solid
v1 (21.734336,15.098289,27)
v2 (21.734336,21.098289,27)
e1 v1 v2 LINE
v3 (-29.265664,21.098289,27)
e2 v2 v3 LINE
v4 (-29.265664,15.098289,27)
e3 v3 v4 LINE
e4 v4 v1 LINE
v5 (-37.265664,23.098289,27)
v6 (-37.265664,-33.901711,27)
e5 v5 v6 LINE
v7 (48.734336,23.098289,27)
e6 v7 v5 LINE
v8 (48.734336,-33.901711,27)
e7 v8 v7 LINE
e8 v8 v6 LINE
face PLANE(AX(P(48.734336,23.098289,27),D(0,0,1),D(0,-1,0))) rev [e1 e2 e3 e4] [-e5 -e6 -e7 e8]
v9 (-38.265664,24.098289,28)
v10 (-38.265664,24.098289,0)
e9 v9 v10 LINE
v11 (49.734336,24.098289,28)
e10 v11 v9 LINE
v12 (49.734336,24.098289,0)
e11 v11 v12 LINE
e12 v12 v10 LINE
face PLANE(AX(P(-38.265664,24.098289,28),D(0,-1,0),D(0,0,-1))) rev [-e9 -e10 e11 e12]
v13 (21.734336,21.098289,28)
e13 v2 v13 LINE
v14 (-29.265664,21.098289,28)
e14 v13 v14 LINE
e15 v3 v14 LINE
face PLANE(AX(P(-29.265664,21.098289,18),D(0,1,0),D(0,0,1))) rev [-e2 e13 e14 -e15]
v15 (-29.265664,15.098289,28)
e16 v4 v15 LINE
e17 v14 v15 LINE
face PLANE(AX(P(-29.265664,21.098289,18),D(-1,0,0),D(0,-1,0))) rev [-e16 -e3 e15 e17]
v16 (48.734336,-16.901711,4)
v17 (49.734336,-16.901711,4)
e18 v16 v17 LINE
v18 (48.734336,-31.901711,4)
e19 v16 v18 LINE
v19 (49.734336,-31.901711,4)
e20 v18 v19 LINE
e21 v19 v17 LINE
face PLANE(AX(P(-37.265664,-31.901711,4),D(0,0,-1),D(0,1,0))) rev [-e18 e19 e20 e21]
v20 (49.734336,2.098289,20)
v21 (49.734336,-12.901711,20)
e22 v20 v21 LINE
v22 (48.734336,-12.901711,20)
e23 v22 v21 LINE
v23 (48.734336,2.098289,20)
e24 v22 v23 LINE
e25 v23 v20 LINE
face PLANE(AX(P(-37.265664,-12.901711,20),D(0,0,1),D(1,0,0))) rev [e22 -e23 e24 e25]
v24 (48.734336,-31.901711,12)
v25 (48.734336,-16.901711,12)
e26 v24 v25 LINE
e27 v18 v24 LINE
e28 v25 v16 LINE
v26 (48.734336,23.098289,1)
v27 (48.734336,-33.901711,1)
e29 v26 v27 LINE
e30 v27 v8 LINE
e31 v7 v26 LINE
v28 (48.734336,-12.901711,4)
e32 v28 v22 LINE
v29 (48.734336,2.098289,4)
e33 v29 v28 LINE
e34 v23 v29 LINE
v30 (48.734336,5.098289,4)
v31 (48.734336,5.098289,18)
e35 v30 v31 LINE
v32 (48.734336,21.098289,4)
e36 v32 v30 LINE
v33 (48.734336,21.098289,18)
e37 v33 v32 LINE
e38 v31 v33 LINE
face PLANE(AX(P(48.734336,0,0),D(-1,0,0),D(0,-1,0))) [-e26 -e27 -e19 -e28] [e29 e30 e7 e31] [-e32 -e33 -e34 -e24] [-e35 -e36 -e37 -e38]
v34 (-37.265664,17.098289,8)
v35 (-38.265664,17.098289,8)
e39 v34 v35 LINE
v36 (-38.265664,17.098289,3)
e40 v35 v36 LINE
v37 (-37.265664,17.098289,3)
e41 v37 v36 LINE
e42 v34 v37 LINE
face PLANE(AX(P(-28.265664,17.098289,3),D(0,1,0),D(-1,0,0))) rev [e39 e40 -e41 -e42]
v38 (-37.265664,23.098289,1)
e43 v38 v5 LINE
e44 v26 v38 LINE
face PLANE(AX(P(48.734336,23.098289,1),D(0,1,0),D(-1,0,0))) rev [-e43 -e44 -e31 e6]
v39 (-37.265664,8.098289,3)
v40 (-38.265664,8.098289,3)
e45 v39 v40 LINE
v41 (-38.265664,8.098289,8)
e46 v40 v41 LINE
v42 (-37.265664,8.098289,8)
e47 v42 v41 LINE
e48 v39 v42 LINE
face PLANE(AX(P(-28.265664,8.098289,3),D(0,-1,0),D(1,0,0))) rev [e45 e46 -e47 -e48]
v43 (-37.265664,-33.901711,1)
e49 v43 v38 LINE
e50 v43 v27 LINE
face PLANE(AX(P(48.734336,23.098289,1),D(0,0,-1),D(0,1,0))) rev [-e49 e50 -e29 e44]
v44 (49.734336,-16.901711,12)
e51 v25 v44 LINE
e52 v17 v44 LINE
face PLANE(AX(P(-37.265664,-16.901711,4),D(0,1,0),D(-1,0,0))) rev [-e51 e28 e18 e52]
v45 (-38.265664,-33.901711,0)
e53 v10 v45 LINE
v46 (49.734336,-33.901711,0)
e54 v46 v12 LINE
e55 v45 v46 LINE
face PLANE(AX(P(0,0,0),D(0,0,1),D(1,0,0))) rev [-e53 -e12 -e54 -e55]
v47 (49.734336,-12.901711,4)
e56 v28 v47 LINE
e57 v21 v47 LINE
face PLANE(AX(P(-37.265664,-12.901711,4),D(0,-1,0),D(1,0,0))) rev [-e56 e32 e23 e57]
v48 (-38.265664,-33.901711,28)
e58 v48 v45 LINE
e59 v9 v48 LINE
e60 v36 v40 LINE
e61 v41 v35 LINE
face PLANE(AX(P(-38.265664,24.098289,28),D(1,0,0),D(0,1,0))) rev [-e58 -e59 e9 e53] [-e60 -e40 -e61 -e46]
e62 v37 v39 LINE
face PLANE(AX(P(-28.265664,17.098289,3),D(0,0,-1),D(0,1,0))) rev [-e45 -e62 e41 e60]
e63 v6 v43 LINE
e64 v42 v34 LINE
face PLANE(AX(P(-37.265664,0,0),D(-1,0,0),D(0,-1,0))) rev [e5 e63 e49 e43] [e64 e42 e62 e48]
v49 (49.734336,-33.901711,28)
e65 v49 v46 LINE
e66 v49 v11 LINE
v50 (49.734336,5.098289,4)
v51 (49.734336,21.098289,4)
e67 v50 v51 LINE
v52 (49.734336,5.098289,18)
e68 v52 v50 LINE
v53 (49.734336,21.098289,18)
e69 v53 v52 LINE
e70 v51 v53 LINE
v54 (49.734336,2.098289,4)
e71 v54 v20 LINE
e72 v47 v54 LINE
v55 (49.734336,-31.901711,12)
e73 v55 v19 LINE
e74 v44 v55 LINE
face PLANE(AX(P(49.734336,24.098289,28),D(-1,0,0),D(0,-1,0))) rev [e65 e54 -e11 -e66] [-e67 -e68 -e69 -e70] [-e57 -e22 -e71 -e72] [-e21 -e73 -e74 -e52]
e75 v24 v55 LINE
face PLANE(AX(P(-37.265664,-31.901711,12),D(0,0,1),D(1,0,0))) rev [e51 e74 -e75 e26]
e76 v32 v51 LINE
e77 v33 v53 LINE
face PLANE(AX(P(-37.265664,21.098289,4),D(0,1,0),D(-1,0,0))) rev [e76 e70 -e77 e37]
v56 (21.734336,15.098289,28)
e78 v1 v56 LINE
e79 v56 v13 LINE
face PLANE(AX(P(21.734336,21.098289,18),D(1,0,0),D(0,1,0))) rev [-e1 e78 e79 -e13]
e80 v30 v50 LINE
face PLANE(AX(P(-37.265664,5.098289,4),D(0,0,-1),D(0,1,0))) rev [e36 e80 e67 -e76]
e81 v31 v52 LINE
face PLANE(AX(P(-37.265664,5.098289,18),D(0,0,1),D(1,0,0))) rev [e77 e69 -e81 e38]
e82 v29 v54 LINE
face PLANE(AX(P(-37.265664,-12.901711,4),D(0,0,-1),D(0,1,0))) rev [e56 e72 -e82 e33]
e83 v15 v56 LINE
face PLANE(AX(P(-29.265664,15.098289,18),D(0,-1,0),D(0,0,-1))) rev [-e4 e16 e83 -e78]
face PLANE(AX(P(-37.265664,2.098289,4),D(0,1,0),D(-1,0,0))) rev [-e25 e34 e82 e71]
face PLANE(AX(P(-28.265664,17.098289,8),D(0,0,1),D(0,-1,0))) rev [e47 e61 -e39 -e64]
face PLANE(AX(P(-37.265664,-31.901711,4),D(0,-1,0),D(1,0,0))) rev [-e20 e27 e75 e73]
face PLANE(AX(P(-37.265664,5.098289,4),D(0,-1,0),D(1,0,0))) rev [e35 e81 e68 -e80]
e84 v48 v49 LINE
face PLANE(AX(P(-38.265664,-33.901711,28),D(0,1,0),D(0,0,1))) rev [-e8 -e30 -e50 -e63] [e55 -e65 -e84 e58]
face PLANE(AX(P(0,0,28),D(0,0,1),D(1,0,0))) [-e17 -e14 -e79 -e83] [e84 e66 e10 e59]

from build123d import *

# Parameters (mm, degrees)
SKETCH_1_W          = 88
SKETCH_1_H          = 58
EXTRUDE_1_DEPTH     = 28
SKETCH_2_W          = 26
SKETCH_2_H          = 56
CUT_EXTRUDE_1_DEPTH = 87
SKETCH_3_W          = 8
SKETCH_3_H          = 15
SKETCH_3_W_2        = 16
SKETCH_3_W_3        = 14
SKETCH_3_H_2        = 16
CUT_EXTRUDE_2_DEPTH = 87
SKETCH_4_W          = 28
SKETCH_4_H          = 58
EXTRUDE_2_DEPTH     = 1
SKETCH_6_W          = 51
SKETCH_6_H          = 6
CUT_EXTRUDE_4_DEPTH = 10
SKETCH_7_W          = 5
SKETCH_7_H          = 9
CUT_EXTRUDE_5_DEPTH = 10
SKETCH_8_W          = 86
SKETCH_8_H          = 26
CUT_EXTRUDE_6_DEPTH = 57


with BuildPart() as part:
    # 草图1 → 凸台-拉伸1 (new body)
    with BuildSketch(Plane.XY):
        with Locations((5.73433584, -4.901711192)):
            Rectangle(SKETCH_1_W, SKETCH_1_H)
    extrude(amount=EXTRUDE_1_DEPTH)

    # 草图2 → 切除-拉伸1 (cut)
    with BuildSketch(Plane.ZY.offset(38.26566416)):
        with Locations((14, -4.901711192)):
            Rectangle(SKETCH_2_W, SKETCH_2_H)
    extrude(amount=-CUT_EXTRUDE_1_DEPTH, mode=Mode.SUBTRACT)

    # 草图3 → 切除-拉伸2 (cut)
    with BuildSketch(Plane(origin=(49.73433584, 0, 0), x_dir=(0, 0, -1), z_dir=(1, 0, 0))):
        with Locations((-8, -24.401711192)):
            Rectangle(SKETCH_3_W, SKETCH_3_H)
        with Locations((-12, -5.401711192)):
            Rectangle(SKETCH_3_W_2, SKETCH_3_H)
        with Locations((-11, 13.098288808)):
            Rectangle(SKETCH_3_W_3, SKETCH_3_H_2)
    extrude(amount=-CUT_EXTRUDE_2_DEPTH, mode=Mode.SUBTRACT)

    # 草图4 → 凸台-拉伸2 (add)
    with BuildSketch(Plane.ZY.offset(38.26566416)):
        with Locations((14, -4.901711192)):
            Rectangle(SKETCH_4_W, SKETCH_4_H)
    extrude(amount=-EXTRUDE_2_DEPTH)

    # 草图6 → 切除-拉伸4 (cut)
    with BuildSketch(Plane.XY.offset(28)):
        with Locations((-3.76566416, 18.098288808)):
            Rectangle(SKETCH_6_W, SKETCH_6_H)
    extrude(amount=-CUT_EXTRUDE_4_DEPTH, mode=Mode.SUBTRACT)

    # 草图7 → 切除-拉伸5 (cut)
    with BuildSketch(Plane.ZY.offset(38.26566416)):
        with Locations((5.5, 12.598288808)):
            Rectangle(SKETCH_7_W, SKETCH_7_H)
    extrude(amount=-CUT_EXTRUDE_5_DEPTH, mode=Mode.SUBTRACT)

    # 草图8 → 切除-拉伸6 (cut)
    with BuildSketch(Plane.XZ.offset(33.901711192)):
        with Locations((5.73433584, 14)):
            Rectangle(SKETCH_8_W, SKETCH_8_H)
    extrude(amount=-CUT_EXTRUDE_6_DEPTH, mode=Mode.SUBTRACT)


solid = part.part
